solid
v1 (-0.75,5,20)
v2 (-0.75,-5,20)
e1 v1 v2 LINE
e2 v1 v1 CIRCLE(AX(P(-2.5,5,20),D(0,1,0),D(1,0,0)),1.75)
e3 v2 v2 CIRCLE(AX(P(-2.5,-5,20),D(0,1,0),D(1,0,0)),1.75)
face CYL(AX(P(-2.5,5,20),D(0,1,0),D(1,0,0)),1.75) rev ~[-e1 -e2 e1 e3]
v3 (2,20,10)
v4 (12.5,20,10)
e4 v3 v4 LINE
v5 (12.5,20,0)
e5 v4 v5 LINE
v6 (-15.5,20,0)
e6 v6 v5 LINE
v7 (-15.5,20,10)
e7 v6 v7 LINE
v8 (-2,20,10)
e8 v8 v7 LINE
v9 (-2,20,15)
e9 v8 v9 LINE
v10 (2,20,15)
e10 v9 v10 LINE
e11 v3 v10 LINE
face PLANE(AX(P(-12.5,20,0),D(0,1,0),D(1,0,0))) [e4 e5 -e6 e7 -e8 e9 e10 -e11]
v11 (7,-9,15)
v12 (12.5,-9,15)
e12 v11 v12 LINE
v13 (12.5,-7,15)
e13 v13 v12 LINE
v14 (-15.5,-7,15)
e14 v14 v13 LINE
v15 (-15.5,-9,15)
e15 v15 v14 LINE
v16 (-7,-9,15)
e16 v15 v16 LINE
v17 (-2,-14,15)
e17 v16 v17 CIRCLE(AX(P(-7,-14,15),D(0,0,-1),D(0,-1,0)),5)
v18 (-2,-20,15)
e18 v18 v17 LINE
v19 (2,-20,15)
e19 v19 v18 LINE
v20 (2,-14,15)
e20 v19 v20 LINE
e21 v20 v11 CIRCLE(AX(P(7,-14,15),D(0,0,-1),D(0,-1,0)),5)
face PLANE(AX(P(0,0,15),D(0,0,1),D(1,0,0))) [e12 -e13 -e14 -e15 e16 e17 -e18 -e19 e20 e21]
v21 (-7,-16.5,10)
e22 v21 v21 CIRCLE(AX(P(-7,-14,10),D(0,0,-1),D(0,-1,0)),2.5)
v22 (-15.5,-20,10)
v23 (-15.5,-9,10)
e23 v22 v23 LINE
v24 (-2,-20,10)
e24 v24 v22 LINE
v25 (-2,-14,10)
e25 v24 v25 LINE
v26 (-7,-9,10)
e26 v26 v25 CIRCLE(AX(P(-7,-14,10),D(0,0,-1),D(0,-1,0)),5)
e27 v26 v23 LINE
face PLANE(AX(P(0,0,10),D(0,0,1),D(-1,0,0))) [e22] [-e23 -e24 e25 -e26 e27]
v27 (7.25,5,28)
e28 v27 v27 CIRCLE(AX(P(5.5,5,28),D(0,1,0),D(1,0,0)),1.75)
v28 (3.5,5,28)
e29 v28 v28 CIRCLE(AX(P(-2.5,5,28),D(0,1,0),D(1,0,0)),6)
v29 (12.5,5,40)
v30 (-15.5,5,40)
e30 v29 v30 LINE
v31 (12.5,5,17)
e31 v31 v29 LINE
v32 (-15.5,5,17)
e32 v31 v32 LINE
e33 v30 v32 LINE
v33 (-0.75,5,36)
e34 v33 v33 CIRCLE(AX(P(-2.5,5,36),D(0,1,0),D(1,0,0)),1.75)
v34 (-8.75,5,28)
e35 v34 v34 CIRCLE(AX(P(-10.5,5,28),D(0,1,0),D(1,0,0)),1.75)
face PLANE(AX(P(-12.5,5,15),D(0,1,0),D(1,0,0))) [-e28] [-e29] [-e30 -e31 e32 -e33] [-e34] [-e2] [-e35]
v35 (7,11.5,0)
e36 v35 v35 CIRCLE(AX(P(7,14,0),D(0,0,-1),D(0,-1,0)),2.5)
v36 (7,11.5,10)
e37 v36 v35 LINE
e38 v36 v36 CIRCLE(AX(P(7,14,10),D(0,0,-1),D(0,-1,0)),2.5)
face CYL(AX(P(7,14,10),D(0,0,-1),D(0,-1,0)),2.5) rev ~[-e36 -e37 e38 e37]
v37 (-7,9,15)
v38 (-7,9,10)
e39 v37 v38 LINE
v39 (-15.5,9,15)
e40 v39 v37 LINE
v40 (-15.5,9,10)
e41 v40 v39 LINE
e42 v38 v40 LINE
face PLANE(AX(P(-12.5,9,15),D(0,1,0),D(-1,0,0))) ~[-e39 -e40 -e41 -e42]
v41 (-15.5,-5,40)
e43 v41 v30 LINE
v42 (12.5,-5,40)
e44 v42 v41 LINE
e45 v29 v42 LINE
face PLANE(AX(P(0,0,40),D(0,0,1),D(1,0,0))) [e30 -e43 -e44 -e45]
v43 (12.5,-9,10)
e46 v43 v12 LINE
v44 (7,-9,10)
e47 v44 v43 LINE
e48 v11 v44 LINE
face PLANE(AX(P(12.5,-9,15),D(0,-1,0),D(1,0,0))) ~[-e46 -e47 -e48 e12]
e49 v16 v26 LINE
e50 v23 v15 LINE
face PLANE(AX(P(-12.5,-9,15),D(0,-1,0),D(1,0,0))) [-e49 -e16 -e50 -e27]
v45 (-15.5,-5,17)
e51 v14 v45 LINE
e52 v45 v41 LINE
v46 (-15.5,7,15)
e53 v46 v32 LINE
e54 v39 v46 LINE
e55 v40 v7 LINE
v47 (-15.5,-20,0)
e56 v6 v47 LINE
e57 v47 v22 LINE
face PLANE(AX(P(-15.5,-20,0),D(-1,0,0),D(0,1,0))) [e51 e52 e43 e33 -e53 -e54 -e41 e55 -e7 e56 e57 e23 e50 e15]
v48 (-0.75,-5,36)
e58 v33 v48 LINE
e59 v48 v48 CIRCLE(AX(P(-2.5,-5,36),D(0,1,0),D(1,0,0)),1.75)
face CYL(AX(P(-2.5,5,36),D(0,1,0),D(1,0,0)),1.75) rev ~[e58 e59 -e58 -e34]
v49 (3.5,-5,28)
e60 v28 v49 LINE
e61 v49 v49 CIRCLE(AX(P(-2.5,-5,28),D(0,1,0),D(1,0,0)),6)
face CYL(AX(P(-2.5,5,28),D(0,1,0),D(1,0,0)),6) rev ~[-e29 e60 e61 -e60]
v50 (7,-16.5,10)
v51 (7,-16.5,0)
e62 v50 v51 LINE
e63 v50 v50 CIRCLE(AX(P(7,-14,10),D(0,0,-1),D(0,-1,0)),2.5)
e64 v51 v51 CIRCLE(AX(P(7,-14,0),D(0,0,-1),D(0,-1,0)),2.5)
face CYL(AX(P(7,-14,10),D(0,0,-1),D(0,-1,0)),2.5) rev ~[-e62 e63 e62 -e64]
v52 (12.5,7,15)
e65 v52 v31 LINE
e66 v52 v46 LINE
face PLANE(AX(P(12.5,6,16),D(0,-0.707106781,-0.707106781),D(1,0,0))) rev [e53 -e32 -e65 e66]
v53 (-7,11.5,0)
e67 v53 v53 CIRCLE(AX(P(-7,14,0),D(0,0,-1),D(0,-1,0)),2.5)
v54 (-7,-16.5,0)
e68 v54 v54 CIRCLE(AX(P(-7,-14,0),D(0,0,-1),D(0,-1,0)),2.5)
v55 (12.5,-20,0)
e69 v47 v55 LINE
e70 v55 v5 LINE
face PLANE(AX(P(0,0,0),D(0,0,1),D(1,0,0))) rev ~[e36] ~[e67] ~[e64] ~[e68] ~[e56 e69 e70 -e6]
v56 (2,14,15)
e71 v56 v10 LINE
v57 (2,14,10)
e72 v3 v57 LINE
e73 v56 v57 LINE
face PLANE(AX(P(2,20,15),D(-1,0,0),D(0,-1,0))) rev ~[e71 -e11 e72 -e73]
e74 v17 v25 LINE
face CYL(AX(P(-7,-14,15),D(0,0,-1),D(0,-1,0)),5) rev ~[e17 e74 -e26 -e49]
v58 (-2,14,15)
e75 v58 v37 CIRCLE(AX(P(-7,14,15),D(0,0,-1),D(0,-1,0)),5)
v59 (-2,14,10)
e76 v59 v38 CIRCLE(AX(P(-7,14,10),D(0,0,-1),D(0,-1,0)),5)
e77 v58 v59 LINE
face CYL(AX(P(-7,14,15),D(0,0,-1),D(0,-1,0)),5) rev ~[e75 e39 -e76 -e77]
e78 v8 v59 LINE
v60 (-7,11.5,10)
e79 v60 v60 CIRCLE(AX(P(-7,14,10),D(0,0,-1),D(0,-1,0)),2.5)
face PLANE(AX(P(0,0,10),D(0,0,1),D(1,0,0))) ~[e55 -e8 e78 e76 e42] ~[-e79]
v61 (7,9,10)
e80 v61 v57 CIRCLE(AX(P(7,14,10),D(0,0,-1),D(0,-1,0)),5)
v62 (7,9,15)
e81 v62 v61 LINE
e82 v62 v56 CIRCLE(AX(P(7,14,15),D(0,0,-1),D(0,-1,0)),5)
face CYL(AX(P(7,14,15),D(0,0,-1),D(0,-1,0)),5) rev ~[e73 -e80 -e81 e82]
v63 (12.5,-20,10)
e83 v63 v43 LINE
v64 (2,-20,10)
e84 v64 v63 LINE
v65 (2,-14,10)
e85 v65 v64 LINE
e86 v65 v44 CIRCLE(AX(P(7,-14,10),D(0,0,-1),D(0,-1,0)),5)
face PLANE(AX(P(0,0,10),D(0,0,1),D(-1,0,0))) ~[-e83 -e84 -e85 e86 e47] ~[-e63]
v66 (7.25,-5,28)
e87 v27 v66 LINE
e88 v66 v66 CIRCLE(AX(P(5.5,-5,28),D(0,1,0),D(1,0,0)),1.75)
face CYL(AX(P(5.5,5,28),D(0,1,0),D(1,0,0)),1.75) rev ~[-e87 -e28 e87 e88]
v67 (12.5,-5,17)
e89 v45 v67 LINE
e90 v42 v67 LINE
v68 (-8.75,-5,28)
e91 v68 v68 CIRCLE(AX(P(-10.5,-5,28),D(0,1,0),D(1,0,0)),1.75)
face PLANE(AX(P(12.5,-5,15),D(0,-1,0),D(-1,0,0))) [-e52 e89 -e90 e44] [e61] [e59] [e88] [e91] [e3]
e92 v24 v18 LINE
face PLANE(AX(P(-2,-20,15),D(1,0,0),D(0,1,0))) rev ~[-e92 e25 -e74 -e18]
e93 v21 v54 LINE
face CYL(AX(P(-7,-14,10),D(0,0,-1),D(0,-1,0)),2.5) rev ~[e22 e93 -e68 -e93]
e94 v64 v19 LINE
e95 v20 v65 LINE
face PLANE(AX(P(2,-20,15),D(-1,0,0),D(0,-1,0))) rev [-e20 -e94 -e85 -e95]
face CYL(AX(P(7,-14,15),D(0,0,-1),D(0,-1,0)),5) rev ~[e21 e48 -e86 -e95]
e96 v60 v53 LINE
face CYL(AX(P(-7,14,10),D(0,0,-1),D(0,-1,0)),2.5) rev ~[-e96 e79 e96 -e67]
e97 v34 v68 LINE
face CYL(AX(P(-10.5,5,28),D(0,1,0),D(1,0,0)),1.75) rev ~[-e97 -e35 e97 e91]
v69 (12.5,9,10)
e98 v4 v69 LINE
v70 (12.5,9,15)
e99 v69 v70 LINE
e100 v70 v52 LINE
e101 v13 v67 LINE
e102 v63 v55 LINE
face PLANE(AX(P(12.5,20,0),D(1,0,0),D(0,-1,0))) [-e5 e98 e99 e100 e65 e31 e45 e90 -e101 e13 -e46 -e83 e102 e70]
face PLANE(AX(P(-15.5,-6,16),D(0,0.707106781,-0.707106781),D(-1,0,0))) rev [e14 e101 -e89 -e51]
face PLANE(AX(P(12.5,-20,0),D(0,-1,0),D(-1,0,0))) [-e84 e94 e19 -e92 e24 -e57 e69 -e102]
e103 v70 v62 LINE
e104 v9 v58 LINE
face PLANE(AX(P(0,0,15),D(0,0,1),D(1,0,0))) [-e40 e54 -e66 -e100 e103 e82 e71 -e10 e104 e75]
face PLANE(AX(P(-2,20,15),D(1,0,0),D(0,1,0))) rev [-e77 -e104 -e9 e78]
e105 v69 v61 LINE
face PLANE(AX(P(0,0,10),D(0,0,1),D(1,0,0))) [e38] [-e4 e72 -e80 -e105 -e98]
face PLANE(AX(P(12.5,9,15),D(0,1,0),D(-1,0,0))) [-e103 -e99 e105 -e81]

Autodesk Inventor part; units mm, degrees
ref_plane "YZ Plane" through (0, 0, 0) normal (1, 0, 0) x (0, 1, 0)
ref_plane "XZ Plane" through (0, 0, 0) normal (0, 1, 0) x (-1, 0, 0)
ref_plane "XY Plane" through (0, 0, 0) normal (0, 0, 1) x (1, 0, 0)
sketch "Sketch1" plane through (0, 0, 0) normal (0, 0, 1) x (1, 0, 0)
  line L0 (-12.5, 20) -> (12.5, 20)
  line L1 (12.5, 20) -> (12.5, -20)
  line L2 (12.5, -20) -> (-12.5, -20)
  line L3 (-12.5, -20) -> (-12.5, 20)
  point P0 (0, 0)
  point P1 (-12.5, 0)
  point P2 (0, 20)
  dimension "d0" = 40
  dimension "d1" = 25
extrude "Extrusion1" add sketch "Sketch1" along normal blind 15
sketch "Sketch3" plane through (0, 0, 15) normal (0, 0, -1) x (-1, 0, 0)
  line L0 (-12.5, -20) -> (-12.5, 20) projected
  line L1 (-12.5, -20) -> (-12.5, 20) projected
  line L2 (12.5, -20) -> (-12.5, -20) projected
  line L3 (-12.5, 20) -> (12.5, 20) projected
  line L4 (0, 0) -> (0, 4.9357) construction
  point P0 (-7, -14)
  point P1 (-7, 14)
  point P2 (0, -20)
  point P3 (0, 20)
  point P4 (7, -14)
  point P5 (7, 14)
  dimension "d21" = 6
  dimension "d22" = 6
  dimension "d24" = 5.5
hole "Hole1" at (7, -14, 15) at (-7, -14, 15) at (-7, 14, 15) at (7, 14, 15) direction (0, 0, -1) diameter 5 end through all counterbore diameter 10 counterbore depth 5
sketch "Sketch4" plane through (0, 0, 15) normal (0, 0, 1) x (1, 0, 0)
  line L0 (-12.5, 5) -> (12.5, 5)
  line L1 (12.5, 5) -> (12.5, -5)
  line L2 (12.5, -5) -> (-12.5, -5)
  line L3 (-12.5, -5) -> (-12.5, 5)
  line L4 (12.5, -20) -> (12.5, 20) projected
  line L5 (-12.5, 20) -> (-12.5, -20) projected
  point P0 (0, 0)
  point P1 (12.5, 0)
  dimension "d20" = 10
extrude "Extrusion3" add sketch "Sketch4" along normal blind 25
sketch "Sketch5" plane through (-12.5, 5, 15) normal (0, 1, 0) x (1, 0, 0)
  circle A0 centre (10, -13) radius 6
  line L0 (25, -25) -> (0, -25) projected
  line L1 (25, 0) -> (25, -25) projected
  circle A1 centre (10, -5) radius 1.75
  circle A2 centre (2, -13) radius 1.75
  circle A3 centre (10, -21) radius 1.75
  circle A4 centre (18, -13) radius 1.75
  point P0 (12.5, 15)
  dimension "d27" = 12
  dimension "d28" = 12
  dimension "d29" = 15
  dimension "d30" = 3.5
  dimension "d31" = 8
  dimension "d34" = 360
extrude "Extrusion4" cut sketch "Sketch5" against normal through all
sketch "Sketch6" plane through (0, 0, 15) normal (0, 0, 1) x (1, 0, 0)
  line L0 (12.5, 5) -> (12.5, 20) projected
  line L1 (12.5, 9) -> (7, 9)
  circle A0 centre (7, 14) radius 5 projected
  line L2 (2, 20) -> (2, 14)
  line L3 (12.5, 20) -> (-12.5, 20) projected
  point P0 (0, 0)
  point P1 (12.5, 7)
extrude "Extrusion5" cut sketch "Sketch6" against normal up to surface (5 mm away) contours L1 A0 L2 L3 L0
mirror "Mirror1" about plane through (0, 0, 0) normal (1, 0, 0) of "Extrusion5"
mirror "Mirror2" about plane through (0, 0, 0) normal (0, 1, 0) of "Extrusion5", "Mirror1"
move faces "Move1" translate (-3, 0, 0) faces at (-12.5, 3, 3.3333)
chamfer "Chamfer2" distance 2 angle 45 2 edges at (-1.5, 5, 15) (-1.5, -5, 15)
equation "\"d22\" = d21"
properties part number "0008-10-013 Supăort Piulita Axa Z"
